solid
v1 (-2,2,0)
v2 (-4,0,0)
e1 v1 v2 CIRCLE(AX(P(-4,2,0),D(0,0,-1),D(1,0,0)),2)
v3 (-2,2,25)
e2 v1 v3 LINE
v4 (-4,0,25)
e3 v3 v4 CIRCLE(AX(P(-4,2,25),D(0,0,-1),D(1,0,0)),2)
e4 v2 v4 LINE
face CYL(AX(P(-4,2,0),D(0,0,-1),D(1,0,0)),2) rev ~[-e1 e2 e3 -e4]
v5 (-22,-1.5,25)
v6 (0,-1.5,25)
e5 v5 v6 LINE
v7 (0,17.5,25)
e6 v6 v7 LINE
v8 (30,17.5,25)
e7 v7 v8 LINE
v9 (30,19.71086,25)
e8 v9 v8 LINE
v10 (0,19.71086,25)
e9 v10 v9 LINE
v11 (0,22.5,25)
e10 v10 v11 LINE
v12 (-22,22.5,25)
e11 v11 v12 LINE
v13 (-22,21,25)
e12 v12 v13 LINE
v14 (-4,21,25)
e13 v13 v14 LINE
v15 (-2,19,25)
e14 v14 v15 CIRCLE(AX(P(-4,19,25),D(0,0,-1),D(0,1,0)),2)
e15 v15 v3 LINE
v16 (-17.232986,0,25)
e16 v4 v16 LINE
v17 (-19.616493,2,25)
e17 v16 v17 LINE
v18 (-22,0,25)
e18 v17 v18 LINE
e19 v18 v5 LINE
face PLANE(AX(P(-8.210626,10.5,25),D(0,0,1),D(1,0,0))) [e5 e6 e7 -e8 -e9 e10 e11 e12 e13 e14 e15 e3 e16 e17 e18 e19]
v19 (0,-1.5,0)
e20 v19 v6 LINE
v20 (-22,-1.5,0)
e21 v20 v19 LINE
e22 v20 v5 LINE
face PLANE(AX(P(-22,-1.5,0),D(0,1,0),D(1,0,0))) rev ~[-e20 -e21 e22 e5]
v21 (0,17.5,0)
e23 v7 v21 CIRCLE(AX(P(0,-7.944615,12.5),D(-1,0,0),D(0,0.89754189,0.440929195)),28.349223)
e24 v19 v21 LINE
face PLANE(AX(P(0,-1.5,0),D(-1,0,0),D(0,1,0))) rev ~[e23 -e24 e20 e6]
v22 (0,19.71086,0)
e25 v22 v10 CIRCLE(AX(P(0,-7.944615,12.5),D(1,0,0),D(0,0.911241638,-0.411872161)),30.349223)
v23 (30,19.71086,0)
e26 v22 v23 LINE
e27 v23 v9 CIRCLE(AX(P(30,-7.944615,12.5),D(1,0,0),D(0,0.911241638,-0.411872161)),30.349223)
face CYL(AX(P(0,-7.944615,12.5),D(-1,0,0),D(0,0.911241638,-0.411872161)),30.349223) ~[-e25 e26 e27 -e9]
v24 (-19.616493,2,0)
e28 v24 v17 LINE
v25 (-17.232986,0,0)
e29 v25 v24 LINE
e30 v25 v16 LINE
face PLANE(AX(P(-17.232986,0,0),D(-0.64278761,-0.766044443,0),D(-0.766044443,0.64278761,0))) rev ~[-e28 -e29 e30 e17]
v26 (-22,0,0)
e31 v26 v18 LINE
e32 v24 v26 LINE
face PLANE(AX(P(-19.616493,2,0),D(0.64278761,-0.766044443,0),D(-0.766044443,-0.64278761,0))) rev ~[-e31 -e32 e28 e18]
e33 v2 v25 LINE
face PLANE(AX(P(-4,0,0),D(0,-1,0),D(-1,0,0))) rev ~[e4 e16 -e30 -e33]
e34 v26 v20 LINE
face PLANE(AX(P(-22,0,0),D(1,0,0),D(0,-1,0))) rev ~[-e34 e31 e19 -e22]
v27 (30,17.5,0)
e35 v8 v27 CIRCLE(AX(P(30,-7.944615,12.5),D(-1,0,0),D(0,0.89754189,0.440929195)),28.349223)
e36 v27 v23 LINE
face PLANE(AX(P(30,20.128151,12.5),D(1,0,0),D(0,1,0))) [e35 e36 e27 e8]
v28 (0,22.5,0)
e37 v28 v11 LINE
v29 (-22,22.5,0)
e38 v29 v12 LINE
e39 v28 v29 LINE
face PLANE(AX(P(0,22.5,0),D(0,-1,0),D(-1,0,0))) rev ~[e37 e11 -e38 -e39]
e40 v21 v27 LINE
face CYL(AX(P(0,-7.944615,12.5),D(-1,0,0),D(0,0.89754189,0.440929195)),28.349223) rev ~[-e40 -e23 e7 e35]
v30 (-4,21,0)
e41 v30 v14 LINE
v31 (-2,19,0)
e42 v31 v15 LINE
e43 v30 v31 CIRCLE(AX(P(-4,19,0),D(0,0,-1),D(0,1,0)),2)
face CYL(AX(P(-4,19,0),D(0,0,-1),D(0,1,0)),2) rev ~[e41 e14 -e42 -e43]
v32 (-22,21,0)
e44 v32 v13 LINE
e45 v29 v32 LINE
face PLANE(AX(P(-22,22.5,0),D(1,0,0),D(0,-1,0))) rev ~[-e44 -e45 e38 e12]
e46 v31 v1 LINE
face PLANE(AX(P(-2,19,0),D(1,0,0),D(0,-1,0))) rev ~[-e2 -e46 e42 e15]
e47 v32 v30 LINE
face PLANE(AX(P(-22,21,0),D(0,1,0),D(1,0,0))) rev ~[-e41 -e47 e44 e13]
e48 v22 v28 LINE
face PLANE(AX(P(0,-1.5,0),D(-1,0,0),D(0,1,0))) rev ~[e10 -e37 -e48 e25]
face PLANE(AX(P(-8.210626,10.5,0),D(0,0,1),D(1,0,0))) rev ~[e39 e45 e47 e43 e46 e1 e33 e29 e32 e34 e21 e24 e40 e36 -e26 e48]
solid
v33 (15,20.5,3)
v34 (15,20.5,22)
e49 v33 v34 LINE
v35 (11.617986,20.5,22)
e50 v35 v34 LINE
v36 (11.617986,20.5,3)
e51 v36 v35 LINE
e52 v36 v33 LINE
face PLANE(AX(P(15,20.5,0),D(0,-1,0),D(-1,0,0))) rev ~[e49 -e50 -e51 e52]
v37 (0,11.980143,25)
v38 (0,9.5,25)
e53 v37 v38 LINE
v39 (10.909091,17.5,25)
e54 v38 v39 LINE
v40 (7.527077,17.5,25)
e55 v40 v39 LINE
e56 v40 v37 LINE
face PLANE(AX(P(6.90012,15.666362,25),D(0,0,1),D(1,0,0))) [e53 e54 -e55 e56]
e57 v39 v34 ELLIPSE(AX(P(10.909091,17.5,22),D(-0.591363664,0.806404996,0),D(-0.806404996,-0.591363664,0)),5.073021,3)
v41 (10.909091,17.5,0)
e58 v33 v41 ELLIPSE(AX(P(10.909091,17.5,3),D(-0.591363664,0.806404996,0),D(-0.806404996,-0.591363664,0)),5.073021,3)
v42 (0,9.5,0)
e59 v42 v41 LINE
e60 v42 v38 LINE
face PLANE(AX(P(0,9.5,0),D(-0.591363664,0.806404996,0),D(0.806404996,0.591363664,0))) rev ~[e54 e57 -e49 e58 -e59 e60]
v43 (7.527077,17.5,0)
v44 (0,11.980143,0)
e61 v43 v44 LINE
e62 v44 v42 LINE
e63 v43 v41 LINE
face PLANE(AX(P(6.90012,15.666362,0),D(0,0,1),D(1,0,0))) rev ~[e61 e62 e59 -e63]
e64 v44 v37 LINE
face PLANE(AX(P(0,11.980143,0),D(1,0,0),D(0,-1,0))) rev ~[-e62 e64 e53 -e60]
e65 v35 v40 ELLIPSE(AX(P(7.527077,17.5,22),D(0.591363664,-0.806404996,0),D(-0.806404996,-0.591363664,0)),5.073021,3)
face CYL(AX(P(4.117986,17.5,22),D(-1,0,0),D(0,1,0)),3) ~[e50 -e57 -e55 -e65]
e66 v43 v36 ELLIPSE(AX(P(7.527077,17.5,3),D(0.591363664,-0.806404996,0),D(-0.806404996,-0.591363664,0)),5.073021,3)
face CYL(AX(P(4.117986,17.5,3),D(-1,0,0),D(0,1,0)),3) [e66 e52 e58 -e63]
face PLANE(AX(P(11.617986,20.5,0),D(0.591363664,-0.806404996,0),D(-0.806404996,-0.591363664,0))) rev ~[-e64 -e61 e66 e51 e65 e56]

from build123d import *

# Parameters (mm, degrees)
F1_DEPTH    = 25
F3_DEPTH    = 30
F4_DEPTH    = 25
F5_T1_DEPTH = 18.3820136796


# Not quite as in the source:
# - a fillet or chamfer that OpenCascade refuses, or shapes differently, is made with other operations: its cross-section is extruded or revolved along the edge and cut away or added


with BuildPart() as f1:
    # F0 (on Top) → F1 (new body)
    with BuildSketch(Plane.XY):
        with BuildLine():
            Line((0, 22.5), (-22, 22.5))
            Line((-22, 22.5), (-22, 21))
            Line((-22, 21), (-17.2329856296, 21))
            Line((-17.2329856296, 21), (-4, 21))
            ThreePointArc((-4, 21), (-2.5857864376, 20.4142135624), (-2, 19))
            Line((-2, 19), (-2, 10.5))
            Line((-2, 10.5), (-2, 2))
            ThreePointArc((-2, 2), (-2.5857864376, 0.5857864376), (-4, 0))
            Line((-4, 0), (-17.2329856296, 0))
            Line((-17.2329856296, 0), (-22, 0))
            Line((-22, 0), (-22, -1.5))
            Line((-22, -1.5), (-2, -1.5))
            Line((-2, -1.5), (0, -1.5))
            Line((0, -1.5), (0, 9.5))
            Line((0, 9.5), (0, 11.980143365))
            Line((0, 11.980143365), (0, 17.5))
            Line((0, 17.5), (0, 22.5))
        make_face()
        Polygon((-19.6164928148, 2), (-22, 0), (-17.2329856296, 0), align=None)
    extrude(amount=F1_DEPTH)

    # F2 (on face) → F3 (join)
    with BuildSketch(Plane.YZ):
        with BuildLine():
            ThreePointArc((17.5, 25), (20.40460778, 12.5), (17.5, 0))
            Line((17.5, 0), (19.7108604723, 0))
            ThreePointArc((19.7108604723, 0), (22.40460778, 12.5), (19.7108604723, 25))
            Line((19.7108604723, 25), (17.5, 25))
        make_face()
    extrude(amount=F3_DEPTH)


with BuildPart() as f4:
    # F0 (on Top) → F4 (new body)
    with BuildSketch(Plane.XY):
        Polygon((11.6179863204, 20.5), (0, 11.980143365), (0, 9.5), (15, 20.5), align=None)
    extrude(amount=F4_DEPTH)

    # F5: fillet of radius 3 on 2 edges, made by hand

    # F5_s2 → F5_t1 (cut)
    with BuildSketch(Plane.YZ.offset(4.1179863204)):
        with BuildLine():
            ThreePointArc((20.5, 22), (19.6213203436, 24.1213203436), (17.5, 25))
            Line((17.5, 25), (20.5, 25))
            Line((20.5, 25), (20.5, 22))
        make_face()
        with BuildLine():
            ThreePointArc((20.5, 3), (19.6213203436, 0.8786796564), (17.5, 0))
            Line((17.5, 0), (20.5, 0))
            Line((20.5, 0), (20.5, 3))
        make_face()
    extrude(amount=F5_T1_DEPTH, mode=Mode.SUBTRACT)


solid = Compound([f1.part, f4.part])
